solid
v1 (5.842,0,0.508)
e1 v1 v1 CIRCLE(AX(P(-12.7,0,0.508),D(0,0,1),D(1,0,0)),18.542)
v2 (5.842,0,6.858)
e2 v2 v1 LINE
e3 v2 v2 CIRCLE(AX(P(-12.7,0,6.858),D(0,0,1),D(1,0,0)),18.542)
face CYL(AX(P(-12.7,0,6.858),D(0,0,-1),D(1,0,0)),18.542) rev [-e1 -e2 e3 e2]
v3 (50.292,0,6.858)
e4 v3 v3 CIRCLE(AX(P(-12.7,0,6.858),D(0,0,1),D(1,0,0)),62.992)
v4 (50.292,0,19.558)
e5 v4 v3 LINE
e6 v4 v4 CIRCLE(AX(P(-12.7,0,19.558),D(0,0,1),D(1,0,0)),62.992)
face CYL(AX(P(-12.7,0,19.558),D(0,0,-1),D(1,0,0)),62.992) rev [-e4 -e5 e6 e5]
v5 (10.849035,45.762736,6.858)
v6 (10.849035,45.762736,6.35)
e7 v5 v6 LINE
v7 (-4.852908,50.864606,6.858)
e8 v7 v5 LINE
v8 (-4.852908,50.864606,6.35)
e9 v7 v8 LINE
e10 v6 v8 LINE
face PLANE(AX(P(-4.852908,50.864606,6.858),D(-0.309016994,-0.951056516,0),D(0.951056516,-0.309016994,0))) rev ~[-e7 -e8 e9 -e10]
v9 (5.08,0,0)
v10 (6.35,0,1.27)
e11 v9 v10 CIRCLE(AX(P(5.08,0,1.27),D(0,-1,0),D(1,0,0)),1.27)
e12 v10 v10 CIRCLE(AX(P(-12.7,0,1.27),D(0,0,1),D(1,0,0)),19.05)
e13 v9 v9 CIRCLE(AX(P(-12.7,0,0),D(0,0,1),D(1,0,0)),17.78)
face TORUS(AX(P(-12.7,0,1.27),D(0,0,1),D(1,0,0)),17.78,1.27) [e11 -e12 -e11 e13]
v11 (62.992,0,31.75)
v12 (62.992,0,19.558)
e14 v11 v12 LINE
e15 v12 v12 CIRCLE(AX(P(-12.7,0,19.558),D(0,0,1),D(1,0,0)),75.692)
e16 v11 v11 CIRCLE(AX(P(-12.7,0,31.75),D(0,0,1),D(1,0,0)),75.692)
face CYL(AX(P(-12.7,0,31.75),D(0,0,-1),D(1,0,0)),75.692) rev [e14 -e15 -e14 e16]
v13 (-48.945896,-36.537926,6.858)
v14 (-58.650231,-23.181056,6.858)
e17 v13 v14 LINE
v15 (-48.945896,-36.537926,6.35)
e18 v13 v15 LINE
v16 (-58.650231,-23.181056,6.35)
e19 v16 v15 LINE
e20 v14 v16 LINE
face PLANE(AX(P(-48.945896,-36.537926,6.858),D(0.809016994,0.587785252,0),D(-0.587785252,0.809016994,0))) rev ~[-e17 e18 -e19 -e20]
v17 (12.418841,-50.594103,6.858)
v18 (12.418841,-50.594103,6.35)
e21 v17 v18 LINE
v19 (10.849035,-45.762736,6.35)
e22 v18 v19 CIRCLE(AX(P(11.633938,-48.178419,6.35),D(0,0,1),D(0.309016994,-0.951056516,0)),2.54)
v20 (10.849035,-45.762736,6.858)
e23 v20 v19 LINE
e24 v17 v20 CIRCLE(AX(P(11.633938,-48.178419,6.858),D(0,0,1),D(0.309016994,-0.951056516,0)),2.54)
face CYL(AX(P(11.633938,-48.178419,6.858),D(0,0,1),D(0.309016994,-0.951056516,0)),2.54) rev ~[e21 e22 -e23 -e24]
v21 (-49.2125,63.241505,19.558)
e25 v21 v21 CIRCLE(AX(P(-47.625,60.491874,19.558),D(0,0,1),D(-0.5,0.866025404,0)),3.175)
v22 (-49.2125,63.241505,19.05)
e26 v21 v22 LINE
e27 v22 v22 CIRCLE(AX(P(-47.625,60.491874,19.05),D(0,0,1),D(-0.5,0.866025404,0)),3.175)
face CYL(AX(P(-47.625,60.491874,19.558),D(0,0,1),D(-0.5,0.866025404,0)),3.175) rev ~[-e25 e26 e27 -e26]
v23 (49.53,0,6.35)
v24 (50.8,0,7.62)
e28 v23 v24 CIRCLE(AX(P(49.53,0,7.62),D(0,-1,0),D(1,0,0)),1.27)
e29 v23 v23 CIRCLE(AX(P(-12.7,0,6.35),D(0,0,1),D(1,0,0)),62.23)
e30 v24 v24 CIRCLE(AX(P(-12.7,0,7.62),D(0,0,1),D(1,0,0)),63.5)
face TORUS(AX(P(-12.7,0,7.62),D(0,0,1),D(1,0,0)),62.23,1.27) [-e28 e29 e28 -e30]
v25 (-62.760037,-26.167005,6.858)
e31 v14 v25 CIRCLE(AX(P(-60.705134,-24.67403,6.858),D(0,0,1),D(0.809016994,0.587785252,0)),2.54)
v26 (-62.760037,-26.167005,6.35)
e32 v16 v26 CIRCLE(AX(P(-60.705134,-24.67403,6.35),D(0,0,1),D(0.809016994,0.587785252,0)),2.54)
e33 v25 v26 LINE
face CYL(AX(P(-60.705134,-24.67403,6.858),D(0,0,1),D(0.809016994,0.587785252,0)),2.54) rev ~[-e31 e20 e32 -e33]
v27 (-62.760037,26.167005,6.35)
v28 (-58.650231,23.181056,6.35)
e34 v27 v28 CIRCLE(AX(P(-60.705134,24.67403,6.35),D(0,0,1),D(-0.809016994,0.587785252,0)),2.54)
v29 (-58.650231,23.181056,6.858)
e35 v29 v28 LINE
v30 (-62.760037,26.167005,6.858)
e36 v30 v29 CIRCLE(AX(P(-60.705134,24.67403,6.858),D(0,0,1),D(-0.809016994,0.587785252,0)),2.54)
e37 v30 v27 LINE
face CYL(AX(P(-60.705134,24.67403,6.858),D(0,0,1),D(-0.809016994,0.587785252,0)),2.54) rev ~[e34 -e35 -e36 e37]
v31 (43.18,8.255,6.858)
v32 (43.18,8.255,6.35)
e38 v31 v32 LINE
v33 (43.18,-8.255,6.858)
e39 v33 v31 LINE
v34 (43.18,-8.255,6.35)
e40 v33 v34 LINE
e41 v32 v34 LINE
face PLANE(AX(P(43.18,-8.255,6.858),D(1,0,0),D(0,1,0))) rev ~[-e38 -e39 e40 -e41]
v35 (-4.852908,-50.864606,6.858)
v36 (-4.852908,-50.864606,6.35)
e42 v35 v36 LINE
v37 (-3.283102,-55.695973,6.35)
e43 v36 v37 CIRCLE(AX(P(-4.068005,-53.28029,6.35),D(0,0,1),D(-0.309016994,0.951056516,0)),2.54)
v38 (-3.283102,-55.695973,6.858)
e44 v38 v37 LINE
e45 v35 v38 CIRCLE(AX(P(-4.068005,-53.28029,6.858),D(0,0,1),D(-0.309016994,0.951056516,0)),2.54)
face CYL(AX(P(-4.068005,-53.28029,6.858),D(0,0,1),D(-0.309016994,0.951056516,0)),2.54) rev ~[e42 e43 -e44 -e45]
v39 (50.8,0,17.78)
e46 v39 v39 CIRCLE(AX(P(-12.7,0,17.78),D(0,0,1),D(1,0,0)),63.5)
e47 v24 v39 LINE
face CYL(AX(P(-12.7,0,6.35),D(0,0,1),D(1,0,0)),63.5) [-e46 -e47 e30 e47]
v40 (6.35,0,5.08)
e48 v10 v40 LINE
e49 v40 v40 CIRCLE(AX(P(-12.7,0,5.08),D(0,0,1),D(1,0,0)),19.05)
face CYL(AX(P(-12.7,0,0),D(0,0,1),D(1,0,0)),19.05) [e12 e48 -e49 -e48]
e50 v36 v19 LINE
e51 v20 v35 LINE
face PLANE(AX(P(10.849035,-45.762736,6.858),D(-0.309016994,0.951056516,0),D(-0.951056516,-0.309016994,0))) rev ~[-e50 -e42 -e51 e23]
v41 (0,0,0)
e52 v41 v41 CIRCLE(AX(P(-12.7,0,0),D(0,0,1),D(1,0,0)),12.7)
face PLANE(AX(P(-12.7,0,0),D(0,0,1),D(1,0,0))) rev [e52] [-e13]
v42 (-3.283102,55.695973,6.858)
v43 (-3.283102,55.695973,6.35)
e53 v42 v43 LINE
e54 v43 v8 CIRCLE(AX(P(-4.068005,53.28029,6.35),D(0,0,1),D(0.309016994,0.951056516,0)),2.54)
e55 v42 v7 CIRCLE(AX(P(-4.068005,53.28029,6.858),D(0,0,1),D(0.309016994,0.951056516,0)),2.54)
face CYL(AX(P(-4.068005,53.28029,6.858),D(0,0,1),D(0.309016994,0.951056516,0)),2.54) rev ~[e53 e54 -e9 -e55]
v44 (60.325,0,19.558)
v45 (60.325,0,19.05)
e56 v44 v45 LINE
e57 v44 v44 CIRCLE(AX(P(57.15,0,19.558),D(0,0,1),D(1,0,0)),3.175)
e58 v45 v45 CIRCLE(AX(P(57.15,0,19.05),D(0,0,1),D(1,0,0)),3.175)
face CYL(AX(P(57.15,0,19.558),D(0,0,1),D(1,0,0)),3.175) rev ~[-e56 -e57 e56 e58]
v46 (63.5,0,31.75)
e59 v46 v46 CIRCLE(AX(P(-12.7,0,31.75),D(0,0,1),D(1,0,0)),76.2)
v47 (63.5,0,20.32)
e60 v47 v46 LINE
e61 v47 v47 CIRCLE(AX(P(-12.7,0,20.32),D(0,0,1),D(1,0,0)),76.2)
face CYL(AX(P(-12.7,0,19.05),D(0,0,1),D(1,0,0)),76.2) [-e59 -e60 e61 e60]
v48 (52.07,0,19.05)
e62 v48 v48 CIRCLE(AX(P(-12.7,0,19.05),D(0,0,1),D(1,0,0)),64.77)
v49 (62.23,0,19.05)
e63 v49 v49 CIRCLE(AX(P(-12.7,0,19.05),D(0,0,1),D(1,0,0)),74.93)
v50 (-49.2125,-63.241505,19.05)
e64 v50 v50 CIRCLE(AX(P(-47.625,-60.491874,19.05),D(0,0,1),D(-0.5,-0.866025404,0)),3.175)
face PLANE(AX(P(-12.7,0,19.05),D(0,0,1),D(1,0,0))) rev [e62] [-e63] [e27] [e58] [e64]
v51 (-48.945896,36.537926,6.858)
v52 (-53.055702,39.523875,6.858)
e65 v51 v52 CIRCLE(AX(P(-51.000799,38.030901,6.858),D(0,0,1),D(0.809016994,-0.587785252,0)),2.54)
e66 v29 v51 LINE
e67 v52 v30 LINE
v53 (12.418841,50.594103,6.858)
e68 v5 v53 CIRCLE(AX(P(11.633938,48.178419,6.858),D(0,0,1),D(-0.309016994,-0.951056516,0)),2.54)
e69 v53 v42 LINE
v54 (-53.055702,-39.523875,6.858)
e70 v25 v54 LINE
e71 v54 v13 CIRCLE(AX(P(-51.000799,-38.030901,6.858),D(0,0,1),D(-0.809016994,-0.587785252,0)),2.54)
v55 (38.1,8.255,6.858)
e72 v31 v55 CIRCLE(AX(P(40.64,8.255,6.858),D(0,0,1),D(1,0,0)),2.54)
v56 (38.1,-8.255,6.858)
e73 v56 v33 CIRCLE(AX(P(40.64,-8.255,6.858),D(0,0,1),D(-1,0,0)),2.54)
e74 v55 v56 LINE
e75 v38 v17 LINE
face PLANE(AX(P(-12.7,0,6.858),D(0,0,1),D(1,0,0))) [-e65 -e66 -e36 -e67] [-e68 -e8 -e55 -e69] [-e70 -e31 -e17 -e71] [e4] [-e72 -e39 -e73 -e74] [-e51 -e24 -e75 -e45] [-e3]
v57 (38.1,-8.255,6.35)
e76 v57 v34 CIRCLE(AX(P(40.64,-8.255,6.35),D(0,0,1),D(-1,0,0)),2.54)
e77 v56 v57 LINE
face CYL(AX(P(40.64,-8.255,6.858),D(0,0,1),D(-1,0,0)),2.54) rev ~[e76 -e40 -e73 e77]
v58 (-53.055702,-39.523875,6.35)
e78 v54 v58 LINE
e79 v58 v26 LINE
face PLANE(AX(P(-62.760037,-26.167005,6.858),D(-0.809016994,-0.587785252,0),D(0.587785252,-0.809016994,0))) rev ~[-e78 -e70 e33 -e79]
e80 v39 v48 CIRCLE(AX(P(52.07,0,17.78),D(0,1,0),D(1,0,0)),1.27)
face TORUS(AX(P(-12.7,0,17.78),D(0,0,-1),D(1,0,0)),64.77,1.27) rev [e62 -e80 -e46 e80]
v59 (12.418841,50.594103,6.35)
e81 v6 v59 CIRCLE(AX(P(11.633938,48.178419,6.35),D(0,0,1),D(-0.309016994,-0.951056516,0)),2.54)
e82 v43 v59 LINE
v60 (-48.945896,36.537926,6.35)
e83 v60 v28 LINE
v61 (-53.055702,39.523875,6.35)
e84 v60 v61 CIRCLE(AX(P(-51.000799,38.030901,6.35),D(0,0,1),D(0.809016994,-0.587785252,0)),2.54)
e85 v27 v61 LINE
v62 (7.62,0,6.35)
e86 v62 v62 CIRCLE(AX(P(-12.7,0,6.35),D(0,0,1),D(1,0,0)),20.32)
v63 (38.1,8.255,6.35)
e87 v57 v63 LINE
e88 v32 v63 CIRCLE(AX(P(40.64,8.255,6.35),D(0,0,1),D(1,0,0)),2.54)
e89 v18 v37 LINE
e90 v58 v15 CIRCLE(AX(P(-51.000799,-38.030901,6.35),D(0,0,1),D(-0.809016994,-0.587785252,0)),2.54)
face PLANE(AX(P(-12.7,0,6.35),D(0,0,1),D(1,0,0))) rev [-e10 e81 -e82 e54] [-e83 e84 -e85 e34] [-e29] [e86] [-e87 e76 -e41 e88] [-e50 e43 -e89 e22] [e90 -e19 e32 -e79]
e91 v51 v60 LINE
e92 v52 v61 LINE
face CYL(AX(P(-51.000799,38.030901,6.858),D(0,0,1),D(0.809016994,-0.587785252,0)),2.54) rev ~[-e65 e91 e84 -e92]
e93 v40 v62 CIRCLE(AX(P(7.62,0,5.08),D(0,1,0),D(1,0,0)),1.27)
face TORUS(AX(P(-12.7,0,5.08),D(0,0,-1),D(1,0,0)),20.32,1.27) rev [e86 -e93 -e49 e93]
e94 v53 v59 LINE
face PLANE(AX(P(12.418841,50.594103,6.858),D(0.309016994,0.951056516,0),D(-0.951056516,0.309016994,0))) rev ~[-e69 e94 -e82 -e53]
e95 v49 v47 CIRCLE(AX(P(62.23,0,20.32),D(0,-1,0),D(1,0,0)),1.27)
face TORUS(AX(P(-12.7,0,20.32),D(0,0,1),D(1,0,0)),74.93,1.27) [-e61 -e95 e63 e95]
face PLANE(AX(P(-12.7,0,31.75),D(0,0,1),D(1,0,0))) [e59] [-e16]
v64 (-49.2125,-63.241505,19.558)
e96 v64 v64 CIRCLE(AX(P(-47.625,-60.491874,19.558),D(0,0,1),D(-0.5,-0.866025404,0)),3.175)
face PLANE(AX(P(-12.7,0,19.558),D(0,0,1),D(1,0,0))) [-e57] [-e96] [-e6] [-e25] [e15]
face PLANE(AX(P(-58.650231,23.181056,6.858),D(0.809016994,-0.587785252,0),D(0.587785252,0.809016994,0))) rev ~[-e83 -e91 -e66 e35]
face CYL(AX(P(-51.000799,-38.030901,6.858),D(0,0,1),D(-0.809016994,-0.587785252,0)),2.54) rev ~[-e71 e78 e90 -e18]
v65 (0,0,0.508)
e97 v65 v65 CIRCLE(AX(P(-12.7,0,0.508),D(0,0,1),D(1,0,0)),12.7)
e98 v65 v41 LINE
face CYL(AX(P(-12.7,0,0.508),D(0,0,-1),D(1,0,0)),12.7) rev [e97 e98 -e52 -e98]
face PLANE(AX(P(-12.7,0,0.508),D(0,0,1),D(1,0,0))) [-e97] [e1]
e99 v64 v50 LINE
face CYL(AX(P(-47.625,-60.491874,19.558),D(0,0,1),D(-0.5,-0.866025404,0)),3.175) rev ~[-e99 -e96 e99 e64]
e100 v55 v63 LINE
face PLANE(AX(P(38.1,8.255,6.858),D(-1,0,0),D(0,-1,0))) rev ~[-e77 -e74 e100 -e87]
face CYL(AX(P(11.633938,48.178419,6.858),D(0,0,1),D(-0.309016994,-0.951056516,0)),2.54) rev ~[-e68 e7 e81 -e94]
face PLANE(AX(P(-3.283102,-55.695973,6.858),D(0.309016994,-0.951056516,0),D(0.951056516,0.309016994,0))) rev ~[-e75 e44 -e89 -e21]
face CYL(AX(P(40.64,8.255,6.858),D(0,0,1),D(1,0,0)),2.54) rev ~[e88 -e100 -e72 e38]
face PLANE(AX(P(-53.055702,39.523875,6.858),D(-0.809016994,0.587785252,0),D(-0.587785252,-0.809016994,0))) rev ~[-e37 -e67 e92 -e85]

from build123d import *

# Parameters (mm, degrees)
F2_R            = 3.175
F3_DEPTH        = 19.559
F3_COPIES_COUNT = 3
F5_DEPTH        = 6.859
F5_COPIES_COUNT = 5
F6_R            = 1.27


# Not quite as in the source:
# - a pattern or mirror of a feature is missing from the dataset's text; its kind, count and spacing are read off the source's solid


with BuildPart() as f1:
    # F0 (on Front) → F1 (revolve)
    with BuildSketch(Plane.XZ):
        Polygon((0, 0.508), (0, 0), (6.35, 0), (6.35, 6.35), (50.8, 6.35), (50.8, 19.05), (63.5, 19.05), (63.5, 31.75), (62.992, 31.75), (62.992, 19.558), (50.292, 19.558), (50.292, 6.858), (5.842, 6.858), (5.842, 0.508), align=None)
    revolve(axis=Axis((-12.7, 0, 6.35), (0, 0, 1)))

    # F2 (on face) → F3 (cut, through all)
    with BuildSketch(Plane.XY.offset(19.558)):
        with Locations((57.15, 0)):
            Circle(F2_R)
    f3 = extrude(amount=-F3_DEPTH, mode=Mode.SUBTRACT)

    # F3_copies: F3 ×3 about axis
    f3_copies_axis = Axis((-12.7, 0, 0), (0, 0, 1))
    for i in range(1, F3_COPIES_COUNT):
        add(f3.rotate(f3_copies_axis, i * 360 / F3_COPIES_COUNT), mode=Mode.SUBTRACT)

    # F4 (on face) → F5 (cut, through all)
    with BuildSketch(Plane.XY.offset(6.858)):
        with BuildLine():
            ThreePointArc((43.18, 8.255), (40.64, 10.795), (38.1, 8.255))
            Line((38.1, 8.255), (43.18, 8.255))
        make_face()
        Polygon((38.1, 8.255), (38.1, 0), (38.1, -8.255), (43.18, -8.255), (43.18, 8.255), align=None)
        with BuildLine():
            Line((43.18, -8.255), (38.1, -8.255))
            ThreePointArc((38.1, -8.255), (40.64, -10.795), (43.18, -8.255))
        make_face()
    f5 = extrude(amount=-F5_DEPTH, mode=Mode.SUBTRACT)

    # F5_copies: F5 ×5 about axis
    f5_copies_axis = Axis((-12.7, 0, 0), (0, 0, 1))
    for i in range(1, F5_COPIES_COUNT):
        add(f5.rotate(f5_copies_axis, i * 360 / F5_COPIES_COUNT), mode=Mode.SUBTRACT)

    # F6
    f6_edges = [f1.edges().sort_by_distance(p)[0] for p in [
        (-88.9, 0, 19.05),
        (-76.2, 0, 19.05),
        (-76.2, 0, 6.35),
        (-31.75, 0, 6.35),
        (-31.75, 0, 0),
    ]]
    fillet(f6_edges, radius=F6_R)


solid = f1.part
